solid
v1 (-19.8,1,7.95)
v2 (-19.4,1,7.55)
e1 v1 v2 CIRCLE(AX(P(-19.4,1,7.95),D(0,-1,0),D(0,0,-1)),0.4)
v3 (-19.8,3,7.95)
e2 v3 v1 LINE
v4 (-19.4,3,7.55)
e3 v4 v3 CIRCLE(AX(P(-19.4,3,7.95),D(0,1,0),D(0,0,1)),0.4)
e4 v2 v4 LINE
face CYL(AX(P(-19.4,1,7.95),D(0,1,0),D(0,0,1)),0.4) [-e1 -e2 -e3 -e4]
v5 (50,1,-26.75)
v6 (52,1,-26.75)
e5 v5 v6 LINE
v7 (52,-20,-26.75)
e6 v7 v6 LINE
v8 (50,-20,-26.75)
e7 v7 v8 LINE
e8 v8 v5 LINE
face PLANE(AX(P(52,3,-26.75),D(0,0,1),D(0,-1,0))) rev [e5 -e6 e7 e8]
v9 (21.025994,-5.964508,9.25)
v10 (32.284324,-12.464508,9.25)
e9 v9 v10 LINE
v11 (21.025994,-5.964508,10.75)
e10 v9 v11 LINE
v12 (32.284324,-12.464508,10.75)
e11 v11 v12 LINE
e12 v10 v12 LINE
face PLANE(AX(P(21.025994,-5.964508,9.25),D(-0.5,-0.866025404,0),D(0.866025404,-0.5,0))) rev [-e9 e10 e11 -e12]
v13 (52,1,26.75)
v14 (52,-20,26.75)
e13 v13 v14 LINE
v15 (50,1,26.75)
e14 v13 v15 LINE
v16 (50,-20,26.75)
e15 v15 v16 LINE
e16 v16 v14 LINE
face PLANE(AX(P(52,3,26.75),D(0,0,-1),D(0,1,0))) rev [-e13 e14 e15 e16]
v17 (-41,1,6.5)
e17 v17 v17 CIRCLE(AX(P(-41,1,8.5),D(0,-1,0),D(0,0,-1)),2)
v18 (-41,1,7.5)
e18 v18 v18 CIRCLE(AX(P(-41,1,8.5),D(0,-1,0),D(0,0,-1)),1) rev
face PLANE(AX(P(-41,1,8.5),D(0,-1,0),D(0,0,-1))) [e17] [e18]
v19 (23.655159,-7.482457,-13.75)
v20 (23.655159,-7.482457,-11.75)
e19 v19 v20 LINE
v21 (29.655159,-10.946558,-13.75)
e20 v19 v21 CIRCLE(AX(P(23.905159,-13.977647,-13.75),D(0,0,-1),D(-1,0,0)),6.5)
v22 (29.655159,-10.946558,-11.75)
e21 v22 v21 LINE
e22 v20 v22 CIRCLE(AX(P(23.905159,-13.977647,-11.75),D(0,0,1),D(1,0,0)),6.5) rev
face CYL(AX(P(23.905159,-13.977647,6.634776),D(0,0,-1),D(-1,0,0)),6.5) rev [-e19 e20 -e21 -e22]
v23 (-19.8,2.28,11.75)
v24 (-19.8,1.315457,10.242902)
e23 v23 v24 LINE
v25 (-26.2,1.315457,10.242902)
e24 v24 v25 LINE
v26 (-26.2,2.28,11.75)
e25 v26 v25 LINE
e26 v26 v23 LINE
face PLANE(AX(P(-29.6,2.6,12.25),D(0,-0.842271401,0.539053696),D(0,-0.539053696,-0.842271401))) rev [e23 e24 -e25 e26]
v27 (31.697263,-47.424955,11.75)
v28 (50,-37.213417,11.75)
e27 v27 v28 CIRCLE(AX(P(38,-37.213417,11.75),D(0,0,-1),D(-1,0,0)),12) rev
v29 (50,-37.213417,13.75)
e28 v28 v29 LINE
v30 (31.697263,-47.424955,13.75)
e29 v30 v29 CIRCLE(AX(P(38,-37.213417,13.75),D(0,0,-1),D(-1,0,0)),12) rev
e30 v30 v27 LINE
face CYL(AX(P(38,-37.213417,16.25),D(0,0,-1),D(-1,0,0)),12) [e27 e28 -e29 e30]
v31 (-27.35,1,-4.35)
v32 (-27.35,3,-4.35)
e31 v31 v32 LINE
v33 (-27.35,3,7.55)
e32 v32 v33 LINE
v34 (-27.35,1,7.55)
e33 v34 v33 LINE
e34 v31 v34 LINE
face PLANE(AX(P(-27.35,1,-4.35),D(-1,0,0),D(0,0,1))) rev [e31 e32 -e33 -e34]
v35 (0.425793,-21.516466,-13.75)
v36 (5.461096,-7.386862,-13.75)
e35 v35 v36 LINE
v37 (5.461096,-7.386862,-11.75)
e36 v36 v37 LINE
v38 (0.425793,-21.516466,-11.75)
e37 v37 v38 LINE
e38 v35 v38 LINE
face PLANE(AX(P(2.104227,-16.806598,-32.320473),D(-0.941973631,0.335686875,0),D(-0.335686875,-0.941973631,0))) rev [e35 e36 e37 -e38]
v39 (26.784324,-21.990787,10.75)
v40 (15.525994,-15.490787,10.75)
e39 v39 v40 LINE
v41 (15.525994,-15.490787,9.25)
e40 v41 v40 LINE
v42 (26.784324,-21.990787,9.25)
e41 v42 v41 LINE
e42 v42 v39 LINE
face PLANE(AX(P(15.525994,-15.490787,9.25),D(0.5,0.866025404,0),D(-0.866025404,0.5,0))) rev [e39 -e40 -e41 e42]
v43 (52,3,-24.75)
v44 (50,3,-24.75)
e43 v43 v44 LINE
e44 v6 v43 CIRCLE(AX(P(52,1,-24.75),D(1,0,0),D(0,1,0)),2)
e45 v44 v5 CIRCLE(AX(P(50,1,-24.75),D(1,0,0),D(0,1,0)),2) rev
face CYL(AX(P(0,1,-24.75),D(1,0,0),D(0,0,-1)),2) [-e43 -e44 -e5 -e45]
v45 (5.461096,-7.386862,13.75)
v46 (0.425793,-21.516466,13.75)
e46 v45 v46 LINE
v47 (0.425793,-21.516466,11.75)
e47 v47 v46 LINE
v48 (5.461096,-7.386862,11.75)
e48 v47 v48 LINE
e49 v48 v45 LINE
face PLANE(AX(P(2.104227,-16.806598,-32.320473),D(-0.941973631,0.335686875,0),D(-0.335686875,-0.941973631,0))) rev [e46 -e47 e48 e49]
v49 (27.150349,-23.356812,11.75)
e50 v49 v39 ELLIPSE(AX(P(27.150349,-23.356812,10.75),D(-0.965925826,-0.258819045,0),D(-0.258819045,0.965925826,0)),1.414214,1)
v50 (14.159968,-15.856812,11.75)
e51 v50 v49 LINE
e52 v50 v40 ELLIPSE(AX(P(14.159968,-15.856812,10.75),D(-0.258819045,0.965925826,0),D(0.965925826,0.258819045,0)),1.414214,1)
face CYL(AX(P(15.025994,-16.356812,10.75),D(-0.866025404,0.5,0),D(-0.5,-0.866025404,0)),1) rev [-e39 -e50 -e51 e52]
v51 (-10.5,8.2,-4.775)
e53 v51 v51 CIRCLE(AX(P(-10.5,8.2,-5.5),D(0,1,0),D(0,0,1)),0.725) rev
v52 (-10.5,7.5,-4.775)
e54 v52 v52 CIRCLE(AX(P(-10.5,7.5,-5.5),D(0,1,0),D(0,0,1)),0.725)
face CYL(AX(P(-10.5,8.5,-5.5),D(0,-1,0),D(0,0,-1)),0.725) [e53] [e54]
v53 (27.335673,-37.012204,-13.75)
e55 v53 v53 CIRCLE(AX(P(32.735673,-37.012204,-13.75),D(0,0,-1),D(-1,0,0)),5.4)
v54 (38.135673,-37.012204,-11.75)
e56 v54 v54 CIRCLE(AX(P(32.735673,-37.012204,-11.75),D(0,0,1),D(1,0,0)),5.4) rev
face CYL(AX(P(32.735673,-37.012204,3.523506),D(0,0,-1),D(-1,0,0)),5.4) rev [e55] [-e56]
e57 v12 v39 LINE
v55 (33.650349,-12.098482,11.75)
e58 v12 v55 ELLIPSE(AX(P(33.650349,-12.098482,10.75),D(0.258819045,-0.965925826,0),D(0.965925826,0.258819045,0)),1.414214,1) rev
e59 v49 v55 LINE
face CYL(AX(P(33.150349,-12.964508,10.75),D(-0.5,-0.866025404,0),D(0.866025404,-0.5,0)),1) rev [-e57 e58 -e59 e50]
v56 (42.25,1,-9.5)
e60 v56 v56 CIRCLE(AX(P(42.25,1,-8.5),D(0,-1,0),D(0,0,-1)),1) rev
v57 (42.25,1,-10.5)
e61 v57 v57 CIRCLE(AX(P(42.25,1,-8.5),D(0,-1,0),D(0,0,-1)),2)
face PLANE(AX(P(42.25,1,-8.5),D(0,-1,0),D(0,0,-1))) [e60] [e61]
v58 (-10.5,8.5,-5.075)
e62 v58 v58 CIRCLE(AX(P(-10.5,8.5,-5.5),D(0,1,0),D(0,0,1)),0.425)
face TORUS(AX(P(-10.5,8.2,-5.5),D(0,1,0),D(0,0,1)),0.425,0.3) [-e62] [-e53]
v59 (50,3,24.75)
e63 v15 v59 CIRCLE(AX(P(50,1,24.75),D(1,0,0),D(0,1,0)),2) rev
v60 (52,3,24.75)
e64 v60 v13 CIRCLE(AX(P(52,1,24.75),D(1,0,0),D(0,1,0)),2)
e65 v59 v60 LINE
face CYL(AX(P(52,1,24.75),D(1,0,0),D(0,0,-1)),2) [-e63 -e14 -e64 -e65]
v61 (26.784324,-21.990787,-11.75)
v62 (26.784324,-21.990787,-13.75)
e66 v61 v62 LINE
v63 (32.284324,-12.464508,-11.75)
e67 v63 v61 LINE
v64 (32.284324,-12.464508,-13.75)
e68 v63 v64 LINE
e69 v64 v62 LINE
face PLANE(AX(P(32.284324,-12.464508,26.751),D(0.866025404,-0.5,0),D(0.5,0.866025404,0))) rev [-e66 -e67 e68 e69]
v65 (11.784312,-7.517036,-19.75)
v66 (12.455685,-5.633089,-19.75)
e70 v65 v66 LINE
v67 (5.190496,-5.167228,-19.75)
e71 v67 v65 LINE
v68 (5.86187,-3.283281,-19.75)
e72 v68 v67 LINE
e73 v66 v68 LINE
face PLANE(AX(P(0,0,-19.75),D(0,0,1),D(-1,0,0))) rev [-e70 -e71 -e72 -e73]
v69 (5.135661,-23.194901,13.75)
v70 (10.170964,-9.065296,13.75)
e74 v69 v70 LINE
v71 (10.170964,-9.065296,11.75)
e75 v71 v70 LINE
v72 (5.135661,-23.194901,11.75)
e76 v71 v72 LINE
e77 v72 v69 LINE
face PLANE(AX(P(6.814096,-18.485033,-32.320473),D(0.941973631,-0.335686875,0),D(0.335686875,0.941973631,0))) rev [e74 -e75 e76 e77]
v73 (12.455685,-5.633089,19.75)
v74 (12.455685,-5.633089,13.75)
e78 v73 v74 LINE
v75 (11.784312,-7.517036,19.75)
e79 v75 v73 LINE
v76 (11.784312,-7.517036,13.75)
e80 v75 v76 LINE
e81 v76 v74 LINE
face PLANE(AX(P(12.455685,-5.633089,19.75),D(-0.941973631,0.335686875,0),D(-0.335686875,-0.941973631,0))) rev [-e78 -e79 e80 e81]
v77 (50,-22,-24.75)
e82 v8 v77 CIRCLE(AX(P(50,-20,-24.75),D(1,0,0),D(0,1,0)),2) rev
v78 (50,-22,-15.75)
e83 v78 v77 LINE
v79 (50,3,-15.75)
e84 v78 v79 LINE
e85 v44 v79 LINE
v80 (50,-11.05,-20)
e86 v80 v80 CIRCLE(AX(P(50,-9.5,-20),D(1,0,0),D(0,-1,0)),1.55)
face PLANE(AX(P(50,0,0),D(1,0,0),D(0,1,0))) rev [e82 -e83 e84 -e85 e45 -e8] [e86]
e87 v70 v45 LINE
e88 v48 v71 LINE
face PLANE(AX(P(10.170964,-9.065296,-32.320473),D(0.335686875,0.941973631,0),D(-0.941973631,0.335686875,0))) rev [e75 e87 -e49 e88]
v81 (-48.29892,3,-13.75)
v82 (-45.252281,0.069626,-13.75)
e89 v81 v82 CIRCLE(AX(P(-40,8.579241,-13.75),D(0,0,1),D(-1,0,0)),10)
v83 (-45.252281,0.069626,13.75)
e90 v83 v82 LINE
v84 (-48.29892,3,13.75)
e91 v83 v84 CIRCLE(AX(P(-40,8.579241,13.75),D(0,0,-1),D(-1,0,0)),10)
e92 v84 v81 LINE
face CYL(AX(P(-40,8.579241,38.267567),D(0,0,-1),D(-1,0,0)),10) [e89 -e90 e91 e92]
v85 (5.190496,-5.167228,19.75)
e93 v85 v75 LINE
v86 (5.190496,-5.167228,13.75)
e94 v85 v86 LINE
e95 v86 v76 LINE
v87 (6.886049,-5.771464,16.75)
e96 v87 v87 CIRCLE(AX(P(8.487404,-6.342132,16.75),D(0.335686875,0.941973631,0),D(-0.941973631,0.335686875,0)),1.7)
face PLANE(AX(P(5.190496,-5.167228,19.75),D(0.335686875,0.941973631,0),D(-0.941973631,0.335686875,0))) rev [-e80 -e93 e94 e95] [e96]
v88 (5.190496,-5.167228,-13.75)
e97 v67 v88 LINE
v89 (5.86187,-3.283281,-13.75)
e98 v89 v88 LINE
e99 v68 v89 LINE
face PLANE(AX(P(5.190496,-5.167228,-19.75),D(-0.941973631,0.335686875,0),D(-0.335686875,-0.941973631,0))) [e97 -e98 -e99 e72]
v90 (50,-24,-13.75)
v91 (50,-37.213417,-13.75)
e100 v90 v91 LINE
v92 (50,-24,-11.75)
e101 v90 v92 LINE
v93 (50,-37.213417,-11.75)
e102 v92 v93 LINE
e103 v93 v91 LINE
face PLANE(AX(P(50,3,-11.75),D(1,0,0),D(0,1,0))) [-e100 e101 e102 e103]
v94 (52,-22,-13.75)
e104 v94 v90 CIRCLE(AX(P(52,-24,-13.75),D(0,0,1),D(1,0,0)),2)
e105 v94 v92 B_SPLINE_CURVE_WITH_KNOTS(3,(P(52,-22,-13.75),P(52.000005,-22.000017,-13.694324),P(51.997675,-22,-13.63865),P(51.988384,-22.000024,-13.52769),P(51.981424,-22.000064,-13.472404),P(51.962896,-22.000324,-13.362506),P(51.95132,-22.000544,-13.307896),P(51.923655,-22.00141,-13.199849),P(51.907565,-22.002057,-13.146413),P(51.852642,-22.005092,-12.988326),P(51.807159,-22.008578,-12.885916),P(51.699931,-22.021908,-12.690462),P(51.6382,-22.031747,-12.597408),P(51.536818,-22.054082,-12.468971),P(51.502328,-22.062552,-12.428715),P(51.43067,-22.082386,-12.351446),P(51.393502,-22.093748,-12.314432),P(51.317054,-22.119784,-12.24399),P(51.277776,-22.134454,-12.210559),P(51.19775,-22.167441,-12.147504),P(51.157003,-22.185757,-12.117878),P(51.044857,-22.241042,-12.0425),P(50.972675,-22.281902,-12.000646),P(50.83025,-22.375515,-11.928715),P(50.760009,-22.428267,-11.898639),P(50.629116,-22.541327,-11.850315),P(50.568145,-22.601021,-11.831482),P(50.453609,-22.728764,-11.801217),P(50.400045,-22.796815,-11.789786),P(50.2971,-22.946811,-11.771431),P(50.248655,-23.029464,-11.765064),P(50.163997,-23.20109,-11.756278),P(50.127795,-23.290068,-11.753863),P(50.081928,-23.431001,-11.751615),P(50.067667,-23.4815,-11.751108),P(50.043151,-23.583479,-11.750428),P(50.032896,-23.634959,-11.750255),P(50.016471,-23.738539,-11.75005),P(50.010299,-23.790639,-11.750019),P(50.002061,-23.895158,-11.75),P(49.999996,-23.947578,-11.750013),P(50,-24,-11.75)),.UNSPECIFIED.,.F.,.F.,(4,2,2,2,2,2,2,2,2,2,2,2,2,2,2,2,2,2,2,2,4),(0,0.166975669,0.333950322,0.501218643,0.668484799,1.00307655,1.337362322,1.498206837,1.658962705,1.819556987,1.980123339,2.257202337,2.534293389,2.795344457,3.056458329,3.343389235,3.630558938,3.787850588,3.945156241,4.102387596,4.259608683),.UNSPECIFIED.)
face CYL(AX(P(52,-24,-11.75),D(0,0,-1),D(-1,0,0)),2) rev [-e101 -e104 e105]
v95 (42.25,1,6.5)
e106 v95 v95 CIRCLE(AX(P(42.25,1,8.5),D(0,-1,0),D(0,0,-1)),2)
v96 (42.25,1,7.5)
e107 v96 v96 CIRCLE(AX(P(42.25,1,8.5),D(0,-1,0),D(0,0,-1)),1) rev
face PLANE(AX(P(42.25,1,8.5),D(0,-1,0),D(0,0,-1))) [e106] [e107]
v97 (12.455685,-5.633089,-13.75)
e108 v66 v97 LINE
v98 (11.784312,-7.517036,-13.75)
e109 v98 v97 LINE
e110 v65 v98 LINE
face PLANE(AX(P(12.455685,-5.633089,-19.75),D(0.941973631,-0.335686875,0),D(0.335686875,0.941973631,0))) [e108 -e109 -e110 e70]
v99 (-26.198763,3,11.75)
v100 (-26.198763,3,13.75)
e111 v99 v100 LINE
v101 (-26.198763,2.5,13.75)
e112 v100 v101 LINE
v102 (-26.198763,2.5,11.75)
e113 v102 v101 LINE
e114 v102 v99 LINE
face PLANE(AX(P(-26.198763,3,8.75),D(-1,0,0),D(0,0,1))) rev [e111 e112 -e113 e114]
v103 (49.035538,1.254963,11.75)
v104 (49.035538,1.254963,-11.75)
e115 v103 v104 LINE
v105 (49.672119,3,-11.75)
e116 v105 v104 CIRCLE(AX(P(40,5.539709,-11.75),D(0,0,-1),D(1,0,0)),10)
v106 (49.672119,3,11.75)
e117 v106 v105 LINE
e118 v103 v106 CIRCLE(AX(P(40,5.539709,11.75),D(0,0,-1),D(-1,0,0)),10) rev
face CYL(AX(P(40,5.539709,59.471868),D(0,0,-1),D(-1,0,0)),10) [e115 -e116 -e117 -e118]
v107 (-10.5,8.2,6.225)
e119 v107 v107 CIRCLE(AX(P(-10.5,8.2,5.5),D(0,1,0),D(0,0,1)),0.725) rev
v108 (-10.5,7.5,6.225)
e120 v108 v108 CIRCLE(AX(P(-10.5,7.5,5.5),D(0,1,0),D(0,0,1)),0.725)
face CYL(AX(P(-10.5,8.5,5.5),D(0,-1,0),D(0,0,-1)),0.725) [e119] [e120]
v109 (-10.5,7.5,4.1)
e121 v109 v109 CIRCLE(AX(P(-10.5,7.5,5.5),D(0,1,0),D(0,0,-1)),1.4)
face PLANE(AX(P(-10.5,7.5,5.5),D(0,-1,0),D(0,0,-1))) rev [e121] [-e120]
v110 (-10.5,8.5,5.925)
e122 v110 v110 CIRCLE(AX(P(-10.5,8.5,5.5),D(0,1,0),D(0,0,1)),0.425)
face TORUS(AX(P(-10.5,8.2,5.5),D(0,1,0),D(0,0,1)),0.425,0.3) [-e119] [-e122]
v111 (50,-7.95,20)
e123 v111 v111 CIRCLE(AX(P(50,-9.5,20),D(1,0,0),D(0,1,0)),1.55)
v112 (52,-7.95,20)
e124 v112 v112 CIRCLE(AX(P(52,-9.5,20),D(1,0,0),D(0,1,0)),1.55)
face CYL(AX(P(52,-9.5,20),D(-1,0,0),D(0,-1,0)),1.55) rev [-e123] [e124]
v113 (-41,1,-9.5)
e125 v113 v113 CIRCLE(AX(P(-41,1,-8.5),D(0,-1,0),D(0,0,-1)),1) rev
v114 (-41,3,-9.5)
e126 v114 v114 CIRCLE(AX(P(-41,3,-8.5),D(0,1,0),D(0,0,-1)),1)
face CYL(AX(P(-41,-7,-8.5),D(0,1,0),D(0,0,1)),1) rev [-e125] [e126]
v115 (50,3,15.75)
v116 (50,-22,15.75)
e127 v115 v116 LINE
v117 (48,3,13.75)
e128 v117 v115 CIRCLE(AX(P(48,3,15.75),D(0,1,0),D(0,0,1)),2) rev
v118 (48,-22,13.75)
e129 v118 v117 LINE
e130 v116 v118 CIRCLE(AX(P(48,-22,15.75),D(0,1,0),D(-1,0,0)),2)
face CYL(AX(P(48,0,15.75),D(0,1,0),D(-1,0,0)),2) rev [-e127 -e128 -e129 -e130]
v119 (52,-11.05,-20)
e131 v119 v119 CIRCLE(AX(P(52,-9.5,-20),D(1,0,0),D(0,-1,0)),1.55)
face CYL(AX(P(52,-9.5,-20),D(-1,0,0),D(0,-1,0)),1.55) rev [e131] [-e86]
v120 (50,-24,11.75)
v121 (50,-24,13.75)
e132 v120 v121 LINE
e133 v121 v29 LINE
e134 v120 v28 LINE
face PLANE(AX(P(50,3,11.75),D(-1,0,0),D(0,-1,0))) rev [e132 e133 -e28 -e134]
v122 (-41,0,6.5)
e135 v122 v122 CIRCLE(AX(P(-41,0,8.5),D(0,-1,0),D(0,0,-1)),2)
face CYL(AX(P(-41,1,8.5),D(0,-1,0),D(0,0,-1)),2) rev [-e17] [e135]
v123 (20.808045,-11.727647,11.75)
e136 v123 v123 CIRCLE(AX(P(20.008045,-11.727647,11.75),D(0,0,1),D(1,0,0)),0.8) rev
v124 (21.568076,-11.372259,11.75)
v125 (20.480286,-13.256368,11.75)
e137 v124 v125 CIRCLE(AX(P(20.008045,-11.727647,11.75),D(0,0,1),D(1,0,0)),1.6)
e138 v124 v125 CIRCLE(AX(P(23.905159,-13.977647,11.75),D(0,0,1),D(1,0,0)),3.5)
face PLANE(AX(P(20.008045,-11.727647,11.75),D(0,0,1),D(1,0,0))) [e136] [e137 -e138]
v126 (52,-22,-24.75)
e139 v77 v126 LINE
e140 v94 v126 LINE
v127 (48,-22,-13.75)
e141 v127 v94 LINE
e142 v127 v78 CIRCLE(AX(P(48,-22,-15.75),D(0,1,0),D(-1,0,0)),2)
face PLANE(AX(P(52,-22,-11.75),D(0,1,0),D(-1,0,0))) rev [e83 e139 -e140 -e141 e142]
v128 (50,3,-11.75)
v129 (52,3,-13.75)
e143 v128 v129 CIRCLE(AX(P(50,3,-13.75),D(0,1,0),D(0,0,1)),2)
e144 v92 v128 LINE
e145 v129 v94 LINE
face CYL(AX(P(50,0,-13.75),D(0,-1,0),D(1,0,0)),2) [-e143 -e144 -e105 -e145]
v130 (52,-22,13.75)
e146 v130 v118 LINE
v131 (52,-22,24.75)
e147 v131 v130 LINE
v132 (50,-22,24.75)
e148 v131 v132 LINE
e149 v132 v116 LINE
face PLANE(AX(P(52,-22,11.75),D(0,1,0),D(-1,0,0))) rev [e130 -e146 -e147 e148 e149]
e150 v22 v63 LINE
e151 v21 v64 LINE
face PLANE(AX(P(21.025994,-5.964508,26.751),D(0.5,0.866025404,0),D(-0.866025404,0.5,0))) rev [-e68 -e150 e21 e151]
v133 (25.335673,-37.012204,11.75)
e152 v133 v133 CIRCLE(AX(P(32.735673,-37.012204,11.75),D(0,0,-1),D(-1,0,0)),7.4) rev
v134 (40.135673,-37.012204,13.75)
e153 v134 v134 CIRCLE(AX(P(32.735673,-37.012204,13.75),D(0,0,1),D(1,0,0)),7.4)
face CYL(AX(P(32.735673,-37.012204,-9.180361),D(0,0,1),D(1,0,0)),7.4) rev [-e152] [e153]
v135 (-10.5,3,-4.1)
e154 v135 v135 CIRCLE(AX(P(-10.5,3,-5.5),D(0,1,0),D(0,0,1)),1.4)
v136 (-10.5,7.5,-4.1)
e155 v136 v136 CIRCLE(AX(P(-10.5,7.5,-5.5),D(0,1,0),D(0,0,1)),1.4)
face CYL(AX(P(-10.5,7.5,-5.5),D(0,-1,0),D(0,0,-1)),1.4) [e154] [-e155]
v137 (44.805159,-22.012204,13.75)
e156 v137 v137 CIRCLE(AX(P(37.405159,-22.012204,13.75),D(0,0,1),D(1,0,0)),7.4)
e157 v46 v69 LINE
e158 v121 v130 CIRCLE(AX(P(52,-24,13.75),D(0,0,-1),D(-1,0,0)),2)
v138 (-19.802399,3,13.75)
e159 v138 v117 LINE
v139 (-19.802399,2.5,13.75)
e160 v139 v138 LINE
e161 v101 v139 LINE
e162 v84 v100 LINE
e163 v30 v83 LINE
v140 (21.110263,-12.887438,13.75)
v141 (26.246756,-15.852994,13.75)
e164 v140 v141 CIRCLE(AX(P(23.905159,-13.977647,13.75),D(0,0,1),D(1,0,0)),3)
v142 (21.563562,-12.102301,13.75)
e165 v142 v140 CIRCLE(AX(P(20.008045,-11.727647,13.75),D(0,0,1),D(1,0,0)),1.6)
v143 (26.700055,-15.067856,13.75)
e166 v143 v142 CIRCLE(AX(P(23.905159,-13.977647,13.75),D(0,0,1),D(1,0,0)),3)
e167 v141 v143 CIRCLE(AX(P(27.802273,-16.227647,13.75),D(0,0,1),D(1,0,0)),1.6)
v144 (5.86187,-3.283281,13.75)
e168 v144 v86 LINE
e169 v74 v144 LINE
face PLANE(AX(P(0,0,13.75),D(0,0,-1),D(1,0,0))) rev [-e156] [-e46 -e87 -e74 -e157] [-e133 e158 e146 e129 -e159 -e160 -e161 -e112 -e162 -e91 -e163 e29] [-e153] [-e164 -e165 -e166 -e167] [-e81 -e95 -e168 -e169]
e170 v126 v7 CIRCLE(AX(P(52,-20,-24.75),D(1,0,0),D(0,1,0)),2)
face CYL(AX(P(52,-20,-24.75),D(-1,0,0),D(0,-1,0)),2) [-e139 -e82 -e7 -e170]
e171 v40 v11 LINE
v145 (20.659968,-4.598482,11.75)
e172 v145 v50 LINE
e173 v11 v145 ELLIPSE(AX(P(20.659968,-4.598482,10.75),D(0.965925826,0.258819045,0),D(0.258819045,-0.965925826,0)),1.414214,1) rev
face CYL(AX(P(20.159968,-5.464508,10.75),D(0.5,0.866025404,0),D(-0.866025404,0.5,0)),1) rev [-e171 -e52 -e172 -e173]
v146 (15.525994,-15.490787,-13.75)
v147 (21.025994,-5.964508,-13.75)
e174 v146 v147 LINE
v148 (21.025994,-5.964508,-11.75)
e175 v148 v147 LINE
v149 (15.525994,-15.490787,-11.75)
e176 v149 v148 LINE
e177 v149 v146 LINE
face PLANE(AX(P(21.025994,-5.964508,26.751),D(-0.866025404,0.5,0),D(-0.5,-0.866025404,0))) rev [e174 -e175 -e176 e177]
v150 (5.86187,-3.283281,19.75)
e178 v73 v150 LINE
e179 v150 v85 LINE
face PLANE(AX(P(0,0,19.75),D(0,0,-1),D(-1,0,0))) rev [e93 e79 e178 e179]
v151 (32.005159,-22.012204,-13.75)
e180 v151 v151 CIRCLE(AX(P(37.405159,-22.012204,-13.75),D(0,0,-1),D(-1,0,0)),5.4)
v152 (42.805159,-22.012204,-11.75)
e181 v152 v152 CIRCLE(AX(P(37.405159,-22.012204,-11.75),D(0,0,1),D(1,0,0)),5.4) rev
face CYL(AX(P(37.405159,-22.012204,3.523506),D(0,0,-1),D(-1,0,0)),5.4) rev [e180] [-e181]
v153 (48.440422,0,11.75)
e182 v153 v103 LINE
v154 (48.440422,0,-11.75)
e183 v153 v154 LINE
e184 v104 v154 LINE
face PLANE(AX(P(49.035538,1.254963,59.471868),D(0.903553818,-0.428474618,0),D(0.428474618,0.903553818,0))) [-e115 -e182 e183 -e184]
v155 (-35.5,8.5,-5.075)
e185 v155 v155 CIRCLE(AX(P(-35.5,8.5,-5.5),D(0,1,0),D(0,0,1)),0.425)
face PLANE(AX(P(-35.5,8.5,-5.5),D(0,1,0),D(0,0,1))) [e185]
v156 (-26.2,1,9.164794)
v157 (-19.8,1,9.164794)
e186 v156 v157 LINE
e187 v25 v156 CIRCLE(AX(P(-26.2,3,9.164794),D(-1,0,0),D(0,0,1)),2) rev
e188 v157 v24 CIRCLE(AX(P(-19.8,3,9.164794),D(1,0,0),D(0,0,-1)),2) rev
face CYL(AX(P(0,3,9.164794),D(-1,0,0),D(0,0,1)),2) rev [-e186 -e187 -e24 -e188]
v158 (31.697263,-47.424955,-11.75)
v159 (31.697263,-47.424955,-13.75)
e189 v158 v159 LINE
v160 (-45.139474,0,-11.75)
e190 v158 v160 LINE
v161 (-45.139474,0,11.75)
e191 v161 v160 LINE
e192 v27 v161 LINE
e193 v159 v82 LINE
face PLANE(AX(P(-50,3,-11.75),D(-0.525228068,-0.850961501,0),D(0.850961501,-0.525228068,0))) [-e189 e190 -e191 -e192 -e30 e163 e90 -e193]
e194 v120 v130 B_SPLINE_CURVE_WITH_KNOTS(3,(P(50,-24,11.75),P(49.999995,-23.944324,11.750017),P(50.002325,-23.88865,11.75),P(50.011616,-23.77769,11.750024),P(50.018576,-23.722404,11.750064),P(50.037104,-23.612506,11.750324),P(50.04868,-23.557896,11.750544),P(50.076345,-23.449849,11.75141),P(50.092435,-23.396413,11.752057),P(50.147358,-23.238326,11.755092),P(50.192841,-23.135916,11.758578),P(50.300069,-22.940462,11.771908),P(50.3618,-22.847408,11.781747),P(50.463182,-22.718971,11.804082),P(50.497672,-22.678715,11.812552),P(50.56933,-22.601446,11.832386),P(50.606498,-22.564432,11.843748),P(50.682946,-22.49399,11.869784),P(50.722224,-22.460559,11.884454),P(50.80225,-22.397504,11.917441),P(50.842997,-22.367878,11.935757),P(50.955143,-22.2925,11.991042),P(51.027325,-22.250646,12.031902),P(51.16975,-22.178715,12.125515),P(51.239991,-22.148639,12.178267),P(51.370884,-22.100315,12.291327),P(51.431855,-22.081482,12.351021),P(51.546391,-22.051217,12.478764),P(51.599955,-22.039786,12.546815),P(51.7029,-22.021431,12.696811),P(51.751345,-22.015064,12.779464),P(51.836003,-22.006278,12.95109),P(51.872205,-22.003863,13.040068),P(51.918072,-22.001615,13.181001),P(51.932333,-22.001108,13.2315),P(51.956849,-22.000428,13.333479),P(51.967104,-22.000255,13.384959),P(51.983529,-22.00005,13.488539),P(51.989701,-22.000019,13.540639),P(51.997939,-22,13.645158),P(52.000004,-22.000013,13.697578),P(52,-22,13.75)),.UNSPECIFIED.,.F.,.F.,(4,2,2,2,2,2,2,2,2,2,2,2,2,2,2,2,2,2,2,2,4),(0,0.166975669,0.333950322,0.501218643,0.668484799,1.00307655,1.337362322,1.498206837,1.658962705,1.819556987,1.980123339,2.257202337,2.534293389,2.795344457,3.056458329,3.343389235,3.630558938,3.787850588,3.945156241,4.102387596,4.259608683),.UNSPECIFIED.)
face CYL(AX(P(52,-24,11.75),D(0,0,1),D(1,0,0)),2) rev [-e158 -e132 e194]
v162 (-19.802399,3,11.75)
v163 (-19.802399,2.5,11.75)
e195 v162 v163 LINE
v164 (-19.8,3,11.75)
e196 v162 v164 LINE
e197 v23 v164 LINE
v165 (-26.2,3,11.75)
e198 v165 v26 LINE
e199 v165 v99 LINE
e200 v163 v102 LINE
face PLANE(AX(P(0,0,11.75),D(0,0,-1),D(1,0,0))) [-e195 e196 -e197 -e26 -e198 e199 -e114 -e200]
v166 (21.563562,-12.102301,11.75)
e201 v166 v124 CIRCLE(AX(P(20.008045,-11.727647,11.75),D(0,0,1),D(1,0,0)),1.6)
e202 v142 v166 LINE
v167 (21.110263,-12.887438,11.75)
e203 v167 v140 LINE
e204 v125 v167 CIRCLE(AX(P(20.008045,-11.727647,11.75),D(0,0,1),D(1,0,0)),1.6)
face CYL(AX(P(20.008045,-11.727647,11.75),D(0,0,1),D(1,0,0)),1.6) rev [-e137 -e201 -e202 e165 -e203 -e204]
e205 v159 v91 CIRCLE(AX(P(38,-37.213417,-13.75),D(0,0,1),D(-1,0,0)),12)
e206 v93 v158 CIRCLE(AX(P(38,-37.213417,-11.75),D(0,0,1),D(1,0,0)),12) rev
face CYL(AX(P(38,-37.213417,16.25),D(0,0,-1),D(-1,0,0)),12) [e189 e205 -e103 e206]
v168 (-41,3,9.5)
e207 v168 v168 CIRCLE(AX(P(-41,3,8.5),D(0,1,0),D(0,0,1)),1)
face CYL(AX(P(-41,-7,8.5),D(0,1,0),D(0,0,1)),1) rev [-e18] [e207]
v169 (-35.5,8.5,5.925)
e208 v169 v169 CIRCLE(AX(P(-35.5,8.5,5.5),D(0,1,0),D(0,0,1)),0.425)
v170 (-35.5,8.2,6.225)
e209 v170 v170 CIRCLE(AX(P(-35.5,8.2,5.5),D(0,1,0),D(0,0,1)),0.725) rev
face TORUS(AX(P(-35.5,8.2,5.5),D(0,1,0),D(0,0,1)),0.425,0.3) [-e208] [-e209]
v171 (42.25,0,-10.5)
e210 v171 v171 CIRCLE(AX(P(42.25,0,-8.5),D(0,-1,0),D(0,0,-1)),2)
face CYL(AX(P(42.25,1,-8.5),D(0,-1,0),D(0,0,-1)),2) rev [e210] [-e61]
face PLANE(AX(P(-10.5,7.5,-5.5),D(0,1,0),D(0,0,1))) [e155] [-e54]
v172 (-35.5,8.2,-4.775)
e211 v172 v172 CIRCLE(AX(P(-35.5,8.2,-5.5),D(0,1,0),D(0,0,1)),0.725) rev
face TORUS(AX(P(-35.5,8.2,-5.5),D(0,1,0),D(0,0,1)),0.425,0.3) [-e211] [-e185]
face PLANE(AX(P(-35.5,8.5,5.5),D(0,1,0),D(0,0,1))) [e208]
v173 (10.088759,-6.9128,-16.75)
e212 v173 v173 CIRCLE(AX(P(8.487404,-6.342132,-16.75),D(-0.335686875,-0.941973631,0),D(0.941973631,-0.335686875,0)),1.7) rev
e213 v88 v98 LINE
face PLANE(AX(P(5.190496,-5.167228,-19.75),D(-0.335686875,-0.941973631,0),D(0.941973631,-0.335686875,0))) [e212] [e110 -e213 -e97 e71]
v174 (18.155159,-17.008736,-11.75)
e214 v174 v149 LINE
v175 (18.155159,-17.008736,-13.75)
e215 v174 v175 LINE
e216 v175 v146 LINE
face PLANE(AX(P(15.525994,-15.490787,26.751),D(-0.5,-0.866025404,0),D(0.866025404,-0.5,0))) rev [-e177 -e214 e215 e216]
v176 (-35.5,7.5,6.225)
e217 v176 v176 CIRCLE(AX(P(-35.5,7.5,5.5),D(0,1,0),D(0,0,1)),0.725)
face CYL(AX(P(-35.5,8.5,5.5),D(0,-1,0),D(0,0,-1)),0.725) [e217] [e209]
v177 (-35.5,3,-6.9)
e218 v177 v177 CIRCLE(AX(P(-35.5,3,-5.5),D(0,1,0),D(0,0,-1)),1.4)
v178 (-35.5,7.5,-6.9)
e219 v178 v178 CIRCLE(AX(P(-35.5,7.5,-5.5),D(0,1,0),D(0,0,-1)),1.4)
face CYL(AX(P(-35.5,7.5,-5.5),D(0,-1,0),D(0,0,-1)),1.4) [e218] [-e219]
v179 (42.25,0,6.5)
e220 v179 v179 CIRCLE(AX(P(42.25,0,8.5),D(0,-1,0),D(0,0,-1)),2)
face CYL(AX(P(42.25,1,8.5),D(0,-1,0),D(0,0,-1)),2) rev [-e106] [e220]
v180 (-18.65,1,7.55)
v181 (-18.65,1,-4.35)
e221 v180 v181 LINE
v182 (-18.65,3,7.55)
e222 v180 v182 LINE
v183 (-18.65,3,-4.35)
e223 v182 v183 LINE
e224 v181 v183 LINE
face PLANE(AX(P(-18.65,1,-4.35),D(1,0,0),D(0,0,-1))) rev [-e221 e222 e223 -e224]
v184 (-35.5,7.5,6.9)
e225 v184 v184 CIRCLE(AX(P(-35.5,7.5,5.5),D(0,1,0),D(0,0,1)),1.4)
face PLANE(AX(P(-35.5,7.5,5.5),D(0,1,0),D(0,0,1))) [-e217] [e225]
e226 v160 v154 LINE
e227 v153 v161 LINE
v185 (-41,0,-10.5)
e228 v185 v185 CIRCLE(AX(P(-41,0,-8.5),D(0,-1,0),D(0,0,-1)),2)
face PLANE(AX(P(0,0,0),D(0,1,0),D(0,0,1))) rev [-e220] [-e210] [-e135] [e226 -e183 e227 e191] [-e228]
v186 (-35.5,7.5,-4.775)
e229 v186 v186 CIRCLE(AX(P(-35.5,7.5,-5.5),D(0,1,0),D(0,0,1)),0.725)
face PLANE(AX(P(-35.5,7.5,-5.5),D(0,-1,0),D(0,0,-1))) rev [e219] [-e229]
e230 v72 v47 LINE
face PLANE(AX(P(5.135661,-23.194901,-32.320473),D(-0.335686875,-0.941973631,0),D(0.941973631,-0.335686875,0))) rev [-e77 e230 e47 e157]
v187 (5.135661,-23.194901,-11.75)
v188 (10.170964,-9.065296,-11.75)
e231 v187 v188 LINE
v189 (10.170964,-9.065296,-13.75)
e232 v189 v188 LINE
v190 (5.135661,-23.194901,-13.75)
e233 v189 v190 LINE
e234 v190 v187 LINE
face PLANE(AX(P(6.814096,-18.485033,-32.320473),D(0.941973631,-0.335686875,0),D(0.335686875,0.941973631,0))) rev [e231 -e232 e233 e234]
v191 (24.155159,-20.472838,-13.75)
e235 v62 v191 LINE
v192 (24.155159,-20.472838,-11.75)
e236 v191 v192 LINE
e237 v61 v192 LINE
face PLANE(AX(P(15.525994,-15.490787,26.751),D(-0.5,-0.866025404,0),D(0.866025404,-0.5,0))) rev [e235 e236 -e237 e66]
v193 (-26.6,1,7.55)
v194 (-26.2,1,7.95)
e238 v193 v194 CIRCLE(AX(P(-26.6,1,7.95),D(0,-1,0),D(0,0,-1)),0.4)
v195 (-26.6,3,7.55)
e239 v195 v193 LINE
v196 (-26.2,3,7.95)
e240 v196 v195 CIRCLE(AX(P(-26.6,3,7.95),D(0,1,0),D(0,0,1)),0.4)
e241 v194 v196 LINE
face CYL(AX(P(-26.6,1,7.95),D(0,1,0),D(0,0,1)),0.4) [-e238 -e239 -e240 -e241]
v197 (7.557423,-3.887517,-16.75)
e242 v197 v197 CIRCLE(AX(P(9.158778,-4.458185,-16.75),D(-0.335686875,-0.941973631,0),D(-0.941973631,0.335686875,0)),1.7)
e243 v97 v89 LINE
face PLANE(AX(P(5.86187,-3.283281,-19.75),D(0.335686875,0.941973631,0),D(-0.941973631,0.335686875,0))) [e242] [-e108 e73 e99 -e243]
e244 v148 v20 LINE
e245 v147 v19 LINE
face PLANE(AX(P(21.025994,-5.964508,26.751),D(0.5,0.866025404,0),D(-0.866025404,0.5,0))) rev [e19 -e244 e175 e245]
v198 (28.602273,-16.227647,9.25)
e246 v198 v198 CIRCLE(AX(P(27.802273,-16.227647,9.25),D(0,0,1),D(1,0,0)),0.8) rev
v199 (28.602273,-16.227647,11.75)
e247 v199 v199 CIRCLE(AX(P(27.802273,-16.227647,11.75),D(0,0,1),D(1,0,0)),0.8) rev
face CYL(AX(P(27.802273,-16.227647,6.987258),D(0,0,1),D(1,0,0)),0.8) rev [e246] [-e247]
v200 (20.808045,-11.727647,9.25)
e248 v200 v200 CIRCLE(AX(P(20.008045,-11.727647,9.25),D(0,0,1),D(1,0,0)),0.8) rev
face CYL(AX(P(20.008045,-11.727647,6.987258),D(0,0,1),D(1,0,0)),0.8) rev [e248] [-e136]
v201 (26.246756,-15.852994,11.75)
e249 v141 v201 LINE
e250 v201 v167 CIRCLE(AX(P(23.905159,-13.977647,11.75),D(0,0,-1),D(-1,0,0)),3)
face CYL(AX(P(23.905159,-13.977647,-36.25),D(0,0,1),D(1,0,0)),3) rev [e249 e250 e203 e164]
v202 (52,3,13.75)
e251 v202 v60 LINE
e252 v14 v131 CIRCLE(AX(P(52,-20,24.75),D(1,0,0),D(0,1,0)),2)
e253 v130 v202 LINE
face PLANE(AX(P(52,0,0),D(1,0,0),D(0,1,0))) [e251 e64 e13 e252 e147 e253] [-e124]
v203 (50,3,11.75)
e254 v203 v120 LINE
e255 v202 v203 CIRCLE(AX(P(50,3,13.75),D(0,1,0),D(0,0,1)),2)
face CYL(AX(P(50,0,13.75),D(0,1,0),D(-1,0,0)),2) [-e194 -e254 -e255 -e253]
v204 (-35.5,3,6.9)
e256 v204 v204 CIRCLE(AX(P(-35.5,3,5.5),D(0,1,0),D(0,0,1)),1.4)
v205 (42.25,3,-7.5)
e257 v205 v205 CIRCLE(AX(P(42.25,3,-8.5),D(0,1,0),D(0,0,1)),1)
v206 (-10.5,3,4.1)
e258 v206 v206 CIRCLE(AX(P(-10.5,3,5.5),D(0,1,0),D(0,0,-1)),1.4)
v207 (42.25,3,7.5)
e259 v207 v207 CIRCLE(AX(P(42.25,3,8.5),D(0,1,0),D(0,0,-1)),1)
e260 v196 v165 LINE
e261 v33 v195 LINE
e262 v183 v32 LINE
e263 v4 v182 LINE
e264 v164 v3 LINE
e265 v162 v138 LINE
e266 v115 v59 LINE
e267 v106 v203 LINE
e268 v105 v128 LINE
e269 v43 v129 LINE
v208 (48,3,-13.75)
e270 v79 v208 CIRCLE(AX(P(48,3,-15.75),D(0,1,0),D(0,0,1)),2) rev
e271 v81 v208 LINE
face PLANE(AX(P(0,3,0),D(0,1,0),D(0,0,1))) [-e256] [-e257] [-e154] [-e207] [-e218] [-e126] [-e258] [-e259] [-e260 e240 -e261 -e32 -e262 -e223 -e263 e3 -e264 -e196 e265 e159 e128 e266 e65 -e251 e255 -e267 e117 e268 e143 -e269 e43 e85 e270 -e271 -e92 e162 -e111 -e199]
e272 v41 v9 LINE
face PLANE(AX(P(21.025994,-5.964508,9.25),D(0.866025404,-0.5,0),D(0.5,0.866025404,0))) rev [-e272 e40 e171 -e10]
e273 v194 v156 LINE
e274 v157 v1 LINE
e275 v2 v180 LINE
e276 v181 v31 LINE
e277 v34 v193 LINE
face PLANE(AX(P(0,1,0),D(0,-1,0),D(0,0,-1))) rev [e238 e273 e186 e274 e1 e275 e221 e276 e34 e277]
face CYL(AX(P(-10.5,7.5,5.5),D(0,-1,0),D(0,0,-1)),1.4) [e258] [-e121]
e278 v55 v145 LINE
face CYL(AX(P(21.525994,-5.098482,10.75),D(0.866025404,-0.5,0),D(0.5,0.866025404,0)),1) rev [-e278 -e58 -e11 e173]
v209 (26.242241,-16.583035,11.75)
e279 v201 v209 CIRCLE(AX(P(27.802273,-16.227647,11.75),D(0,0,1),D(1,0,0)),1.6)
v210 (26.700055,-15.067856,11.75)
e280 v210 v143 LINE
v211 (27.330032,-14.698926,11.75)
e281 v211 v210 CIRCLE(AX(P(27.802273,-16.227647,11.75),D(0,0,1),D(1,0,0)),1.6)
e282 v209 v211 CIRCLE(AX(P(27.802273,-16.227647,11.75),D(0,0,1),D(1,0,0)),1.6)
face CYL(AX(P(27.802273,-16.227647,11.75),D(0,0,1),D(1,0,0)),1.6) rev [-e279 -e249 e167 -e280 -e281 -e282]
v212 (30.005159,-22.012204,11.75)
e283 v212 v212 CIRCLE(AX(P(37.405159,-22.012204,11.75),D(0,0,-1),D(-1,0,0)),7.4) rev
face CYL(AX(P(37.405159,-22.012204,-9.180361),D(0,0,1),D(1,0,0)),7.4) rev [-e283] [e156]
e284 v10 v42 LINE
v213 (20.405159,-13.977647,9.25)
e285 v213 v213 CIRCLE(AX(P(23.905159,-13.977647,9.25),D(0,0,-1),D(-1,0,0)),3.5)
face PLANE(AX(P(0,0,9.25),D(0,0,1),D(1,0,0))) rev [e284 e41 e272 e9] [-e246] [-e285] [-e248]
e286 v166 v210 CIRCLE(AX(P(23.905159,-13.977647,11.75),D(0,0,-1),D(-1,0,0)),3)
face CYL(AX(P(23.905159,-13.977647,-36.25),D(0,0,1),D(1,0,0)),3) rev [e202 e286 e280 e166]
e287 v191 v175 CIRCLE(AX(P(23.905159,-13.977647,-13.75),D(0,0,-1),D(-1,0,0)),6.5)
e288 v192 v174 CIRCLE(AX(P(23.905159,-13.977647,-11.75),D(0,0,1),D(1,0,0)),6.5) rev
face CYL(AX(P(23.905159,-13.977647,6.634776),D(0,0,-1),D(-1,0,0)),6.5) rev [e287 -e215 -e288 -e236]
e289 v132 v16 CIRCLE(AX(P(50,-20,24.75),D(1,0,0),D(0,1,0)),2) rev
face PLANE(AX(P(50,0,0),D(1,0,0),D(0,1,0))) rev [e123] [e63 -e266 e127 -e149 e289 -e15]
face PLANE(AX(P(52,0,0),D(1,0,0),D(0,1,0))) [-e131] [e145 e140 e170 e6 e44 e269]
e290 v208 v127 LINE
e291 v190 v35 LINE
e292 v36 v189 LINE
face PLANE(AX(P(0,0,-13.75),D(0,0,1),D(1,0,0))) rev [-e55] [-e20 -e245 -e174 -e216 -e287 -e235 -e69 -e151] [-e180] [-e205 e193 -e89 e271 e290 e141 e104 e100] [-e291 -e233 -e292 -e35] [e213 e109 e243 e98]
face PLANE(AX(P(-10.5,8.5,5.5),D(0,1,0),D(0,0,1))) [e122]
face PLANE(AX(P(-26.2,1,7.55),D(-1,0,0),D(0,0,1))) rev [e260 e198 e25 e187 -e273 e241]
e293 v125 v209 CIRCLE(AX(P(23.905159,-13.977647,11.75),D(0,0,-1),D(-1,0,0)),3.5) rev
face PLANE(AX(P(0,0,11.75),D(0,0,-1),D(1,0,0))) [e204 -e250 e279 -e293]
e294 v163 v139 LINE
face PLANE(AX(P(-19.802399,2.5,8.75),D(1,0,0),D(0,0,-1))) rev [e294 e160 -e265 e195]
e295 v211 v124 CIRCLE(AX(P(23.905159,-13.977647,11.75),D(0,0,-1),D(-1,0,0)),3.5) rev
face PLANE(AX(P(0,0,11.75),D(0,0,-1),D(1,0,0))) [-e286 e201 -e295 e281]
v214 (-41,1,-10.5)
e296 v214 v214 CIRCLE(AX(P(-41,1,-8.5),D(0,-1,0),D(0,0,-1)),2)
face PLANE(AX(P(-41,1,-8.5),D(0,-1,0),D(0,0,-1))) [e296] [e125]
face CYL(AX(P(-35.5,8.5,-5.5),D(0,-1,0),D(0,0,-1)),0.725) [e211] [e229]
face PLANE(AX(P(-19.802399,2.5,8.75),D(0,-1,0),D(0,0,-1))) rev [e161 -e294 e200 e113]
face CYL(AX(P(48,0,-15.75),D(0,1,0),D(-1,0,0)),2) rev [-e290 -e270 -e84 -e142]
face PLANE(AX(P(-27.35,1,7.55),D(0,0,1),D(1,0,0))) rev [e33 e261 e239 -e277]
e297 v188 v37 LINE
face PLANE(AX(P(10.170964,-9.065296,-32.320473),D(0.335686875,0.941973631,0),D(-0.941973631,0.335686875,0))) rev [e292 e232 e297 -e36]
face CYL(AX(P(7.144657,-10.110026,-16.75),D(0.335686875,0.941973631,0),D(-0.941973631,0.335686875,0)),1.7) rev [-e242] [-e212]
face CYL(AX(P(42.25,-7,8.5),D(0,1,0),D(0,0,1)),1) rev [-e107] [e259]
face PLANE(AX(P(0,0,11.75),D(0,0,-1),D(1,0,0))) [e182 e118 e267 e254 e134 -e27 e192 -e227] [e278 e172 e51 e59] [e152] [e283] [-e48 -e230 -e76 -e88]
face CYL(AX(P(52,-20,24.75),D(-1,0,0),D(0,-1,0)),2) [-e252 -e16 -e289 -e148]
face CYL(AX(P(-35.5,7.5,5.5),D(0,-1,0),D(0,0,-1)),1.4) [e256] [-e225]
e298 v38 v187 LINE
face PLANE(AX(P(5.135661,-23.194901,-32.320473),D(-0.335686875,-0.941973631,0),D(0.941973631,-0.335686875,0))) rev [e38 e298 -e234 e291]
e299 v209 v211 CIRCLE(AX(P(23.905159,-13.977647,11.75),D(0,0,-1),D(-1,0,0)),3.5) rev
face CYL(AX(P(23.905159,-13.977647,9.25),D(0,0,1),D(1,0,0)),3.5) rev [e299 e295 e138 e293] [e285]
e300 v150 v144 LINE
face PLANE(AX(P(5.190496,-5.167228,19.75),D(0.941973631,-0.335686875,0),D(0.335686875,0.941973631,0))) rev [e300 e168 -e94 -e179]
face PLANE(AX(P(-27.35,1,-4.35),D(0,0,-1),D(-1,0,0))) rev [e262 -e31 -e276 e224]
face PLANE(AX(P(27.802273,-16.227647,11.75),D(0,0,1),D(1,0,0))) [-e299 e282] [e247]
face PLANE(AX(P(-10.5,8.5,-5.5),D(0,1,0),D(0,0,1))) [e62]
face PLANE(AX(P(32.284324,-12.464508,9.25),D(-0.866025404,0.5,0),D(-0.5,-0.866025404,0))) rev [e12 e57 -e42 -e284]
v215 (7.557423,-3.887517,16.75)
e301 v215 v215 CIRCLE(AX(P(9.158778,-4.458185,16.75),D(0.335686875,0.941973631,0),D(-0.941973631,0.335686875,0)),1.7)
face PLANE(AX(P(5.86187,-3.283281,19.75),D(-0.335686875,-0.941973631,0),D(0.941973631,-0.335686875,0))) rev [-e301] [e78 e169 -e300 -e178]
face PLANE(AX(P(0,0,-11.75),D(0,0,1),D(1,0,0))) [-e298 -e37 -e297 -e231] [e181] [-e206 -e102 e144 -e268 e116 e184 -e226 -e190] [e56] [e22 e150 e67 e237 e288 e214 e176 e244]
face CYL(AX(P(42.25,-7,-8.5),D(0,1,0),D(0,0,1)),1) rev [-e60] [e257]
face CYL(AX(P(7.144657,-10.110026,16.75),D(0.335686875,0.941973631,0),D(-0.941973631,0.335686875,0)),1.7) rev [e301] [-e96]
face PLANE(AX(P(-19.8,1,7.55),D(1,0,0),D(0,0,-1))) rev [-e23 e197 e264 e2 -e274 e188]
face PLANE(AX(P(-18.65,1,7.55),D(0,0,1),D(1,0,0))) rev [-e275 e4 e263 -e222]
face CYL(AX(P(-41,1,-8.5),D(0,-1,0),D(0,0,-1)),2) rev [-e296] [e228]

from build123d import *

# Parameters (mm, degrees)
SKETCH_1_W           = 100
SKETCH_1_H           = 25.5
EXTRUDE_1_DEPTH      = 3
EXTRUDE_2_DEPTH      = 1.5
SKETCH_5_R           = 1.4
EXTRUDE_3_DEPTH      = 4.5
SKETCH_6_R           = 0.725
EXTRUDE_4_DEPTH      = 1
SKETCH_7_R           = 1
CUT_EXTRUDE_1_DEPTH  = 10
SKETCH_8_R           = 2
CUT_EXTRUDE_2_DEPTH  = 1
FILLET_1_R           = 2
FILLET_2_R           = 0.3
CUT_EXTRUDE_8_DEPTH  = 2
CUT_EXTRUDE_9_DEPTH  = 1.5
EXTRUDE_6_DEPTH      = 6.4
FILLET_3_R           = 2
FILLET_5_R           = 1
FILLET_6_R           = 0.4
EXTRUDE_12_DEPTH     = 1
CUT_EXTRUDE_20_DEPTH = 27.5
CUT_EXTRUDE_21_DEPTH = 23.5
CUT_EXTRUDE_22_DEPTH = 30
SKETCH_41_R          = 3
CUT_EXTRUDE_25_DEPTH = 50
SKETCH_48_W          = 6.396363923
SKETCH_48_H          = 0.5
CUT_EXTRUDE_30_DEPTH = 5
SKETCH_50_W          = 15
SKETCH_50_H          = 25
SKETCH_50_R          = 1.55
EXTRUDE_14_DEPTH     = 2
FILLET_8_R           = 2
FILLET_9_R           = 2
FILLET_10_R          = 2
SKETCH_52_R          = 3.5
EXTRUDE_15_DEPTH     = 2.5
SKETCH_51_R          = 0.8
CUT_EXTRUDE_31_DEPTH = 4.5
SKETCH_53_R          = 1.6
CUT_EXTRUDE_34_DEPTH = 2
FILLET_11_R          = 1
SKETCH_54_R          = 6.5
CUT_EXTRUDE_35_DEPTH = 2
CUT_EXTRUDE_36_DEPTH = 2
SKETCH_57_R          = 7.4
CUT_EXTRUDE_37_DEPTH = 2
CUT_EXTRUDE_START    = -40.5
CUT_EXTRUDE_38_DEPTH = 53.5
EXTRUDE_16_DEPTH     = 6
SKETCH_61_R          = 1.7
CUT_EXTRUDE_39_DEPTH = 6
SKETCH_62_R          = 5.4
CUT_EXTRUDE_40_DEPTH = 2


with BuildPart() as part:
    # 草图1 → 凸台-拉伸1 (new body)
    with BuildSketch(Plane(origin=(0, 0, 0), x_dir=(1, 0, 0), z_dir=(0, 1, 0))):
        Rectangle(SKETCH_1_W, SKETCH_1_H)
    extrude(amount=EXTRUDE_1_DEPTH)

    # 草图2 → 凸台-拉伸2 (add)
    with BuildSketch(Plane(origin=(0, 3, 0), x_dir=(1, 0, 0), z_dir=(0, 1, 0))):
        Polygon((-5.35, 5.35), (5.35, 5.35), (5.35, -7.55), (4.35, -7.55), (4.35, 4.35), (-4.35, 4.35), (-4.35, -7.55), (-5.35, -7.55), align=None)
    extrude(amount=EXTRUDE_2_DEPTH)

    # 草图5 → 凸台-拉伸3 (add)
    with BuildSketch(Plane(origin=(0, 3, 0), x_dir=(1, 0, 0), z_dir=(0, 1, 0))):
        with Locations(Location((-10.5, 5.5, 0), (0, 0, 270))):
            Circle(SKETCH_5_R)
        with Locations(Location((-10.5, -5.5, 0), (0, 0, 90))):
            Circle(SKETCH_5_R)
        with Locations(Location((-35.5, -5.5, 0), (0, 0, 270))):
            Circle(SKETCH_5_R)
        with Locations(Location((-35.5, 5.5, 0), (0, 0, 90))):
            Circle(SKETCH_5_R)
    extrude(amount=EXTRUDE_3_DEPTH)

    # 草图6 → 凸台-拉伸4 (add)
    with BuildSketch(Plane(origin=(0, 7.5, 0), x_dir=(1, 0, 0), z_dir=(0, 1, 0))):
        with Locations(Location((-35.5, -5.5, 0), (0, 0, 270))):
            Circle(SKETCH_6_R)
        with Locations(Location((-35.5, 5.5, 0), (0, 0, 270))):
            Circle(SKETCH_6_R)
        with Locations(Location((-10.5, 5.5, 0), (0, 0, 270))):
            Circle(SKETCH_6_R)
        with Locations(Location((-10.5, -5.5, 0), (0, 0, 270))):
            Circle(SKETCH_6_R)
    extrude(amount=EXTRUDE_4_DEPTH)

    # 草图7 → 切除-拉伸1 (cut)
    with BuildSketch(Plane(origin=(0, 3, 0), x_dir=(1, 0, 0), z_dir=(0, 1, 0))):
        with Locations(Location((42.25, 8.5, 0), (0, 0, 270))):
            Circle(SKETCH_7_R)
        with Locations(Location((-41, 8.5, 0), (0, 0, 270))):
            Circle(SKETCH_7_R)
        with Locations(Location((-41, -8.5, 0), (0, 0, 270))):
            Circle(SKETCH_7_R)
        with Locations(Location((42.25, -8.5, 0), (0, 0, 270))):
            Circle(SKETCH_7_R)
    extrude(amount=-CUT_EXTRUDE_1_DEPTH, mode=Mode.SUBTRACT)

    # 草图8 → 切除-拉伸2 (cut)
    with BuildSketch(Plane.XZ):
        with Locations(Location((-41, 8.5, 0), (0, 0, 270))):
            Circle(SKETCH_8_R)
        with Locations(Location((42.25, 8.5, 0), (0, 0, 270))):
            Circle(SKETCH_8_R)
        with Locations(Location((42.25, -8.5, 0), (0, 0, 270))):
            Circle(SKETCH_8_R)
        with Locations(Location((-41, -8.5, 0), (0, 0, 270))):
            Circle(SKETCH_8_R)
    extrude(amount=-CUT_EXTRUDE_2_DEPTH, mode=Mode.SUBTRACT)

    # 圆角1
    fillet_1_edges = [part.edges().sort_by_distance(p)[0] for p in [
        (50, 1.5, 12.75),
        (-50, 1.5, 12.75),
        (-50, 1.5, -12.75),
        (50, 1.5, -12.75),
    ]]
    fillet(fillet_1_edges, radius=FILLET_1_R)

    # 圆角2
    fillet_2_edges = [part.edges().sort_by_distance(p)[0] for p in [
        (-35.5, 8.5, 4.775),
        (-35.5, 8.5, -6.225),
        (-10.5, 8.5, -6.225),
        (-10.5, 8.5, 4.775),
    ]]
    fillet(fillet_2_edges, radius=FILLET_2_R)

    # 草图15 → 切除-拉伸8 (cut)
    with BuildSketch(Plane(origin=(0, 3, 0), x_dir=(1, 0, 0), z_dir=(0, 1, 0))):
        Polygon((-27.35, 4.35), (-18.65, 4.35), (-18.65, -7.55), (-19.8, -7.55), (-19.8, -12.75), (-26.2, -12.75), (-26.2, -7.55), (-27.35, -7.55), align=None)
    extrude(amount=-CUT_EXTRUDE_8_DEPTH, mode=Mode.SUBTRACT)

    # 草图17 → 切除-拉伸9 (cut)
    with BuildSketch(Plane(origin=(0, 4.5, 0), x_dir=(1, 0, 0), z_dir=(0, 1, 0))):
        Polygon((-4.35, -7.55), (-4.35, 4.35), (4.35, 4.35), (4.35, -7.55), (5.35, -7.55), (5.35, 5.35), (-5.35, 5.35), (-5.35, -7.55), align=None)
    extrude(amount=-CUT_EXTRUDE_9_DEPTH, mode=Mode.SUBTRACT)

    # 草图18 → 凸台-拉伸6 (add)
    with BuildSketch(Plane.ZY.offset(19.8)):
        Polygon((12.75, 1), (9.75, 1), (12.25, 2.6), (12.75, 2.6), align=None)
    extrude(amount=EXTRUDE_6_DEPTH)

    # 圆角3
    fillet_3_edges = [part.edges().sort_by_distance(p)[0] for p in [
        (-23, 1, 9.75),
    ]]
    fillet(fillet_3_edges, radius=FILLET_3_R)

    # 圆角5
    fillet_5_edges = [part.edges().sort_by_distance(p)[0] for p in [
        (-23, 2.6, 12.25),
    ]]
    fillet(fillet_5_edges, radius=FILLET_5_R)

    # 圆角6
    fillet_6_edges = [part.edges().sort_by_distance(p)[0] for p in [
        (-19.8, 2, 7.55),
        (-26.2, 2, 7.55),
    ]]
    fillet(fillet_6_edges, radius=FILLET_6_R)

    # 草图26 → 凸台-拉伸12 (add, symmetric)
    with BuildSketch(Plane(origin=(0, 0, -12.75), x_dir=(-1, 0, 0), z_dir=(0, 0, -1))):
        Polygon((50, 3), (-47.226468446, -57.009847793), (-50, -58.721719149), (-50, 3), align=None)
    extrude_12 = extrude(amount=EXTRUDE_12_DEPTH, both=True)

    # 镜向1: 凸台-拉伸12 across plane
    add(extrude_12.mirror(Plane.XY))

    # 草图34 → 切除-拉伸20 (cut)
    with BuildSketch(Plane(origin=(0, 0, -13.75), x_dir=(-1, 0, 0), z_dir=(0, 0, -1))):
        with BuildLine():
            Line((50, 15.008699923), (50, 8.579241028))
            ThreePointArc((50, 8.579241028), (48.73277753, 3.707013959), (45.252280679, 0.069626015))
            Line((45.252280679, 0.069626015), (38.344857738, -4.193754173))
            Line((38.344857738, -4.193754173), (52.839499898, -4.765435378))
            Line((52.839499898, -4.765435378), (50, 15.008699923))
        make_face()
    extrude(amount=-CUT_EXTRUDE_20_DEPTH, mode=Mode.SUBTRACT)

    # 草图35 → 切除-拉伸21 (cut)
    with BuildSketch(Plane.XY.offset(-11.75)):
        with BuildLine():
            Line((50, 10.630966152), (50, 5.53970897))
            ThreePointArc((50, 5.53970897), (49.755905436, 3.343733306), (49.035538177, 1.254962787))
            Line((49.035538177, 1.254962787), (33.740658756, -30.998398561))
            Line((33.740658756, -30.998398561), (57.072453739, -23.756268409))
            Line((57.072453739, -23.756268409), (50, 10.630966152))
        make_face()
    extrude(amount=CUT_EXTRUDE_21_DEPTH, mode=Mode.SUBTRACT)

    # 草图37 → 切除-拉伸22 (cut)
    with BuildSketch(Plane(origin=(0, 0, -13.75), x_dir=(-1, 0, 0), z_dir=(0, 0, -1))):
        with BuildLine():
            Line((-50, -58.721719149), (-31.697263185, -47.424955336))
            ThreePointArc((-31.697263185, -47.424955336), (-43.846672482, -47.692750357), (-50, -37.21341732))
            Line((-50, -37.21341732), (-50, -58.721719149))
        make_face()
    extrude(amount=-CUT_EXTRUDE_22_DEPTH, mode=Mode.SUBTRACT)

    # 草图41 → 切除-拉伸25 (cut)
    with BuildSketch(Plane.XY.offset(13.75)):
        with Locations((23.905158818, -13.977647254)):
            Circle(SKETCH_41_R)
    extrude(amount=-CUT_EXTRUDE_25_DEPTH, mode=Mode.SUBTRACT)

    # 草图48 → 切除-拉伸30 (cut)
    with BuildSketch(Plane.XY.offset(13.75)):
        with Locations((-23.000580627, 2.75)):
            Rectangle(SKETCH_48_W, SKETCH_48_H)
    extrude(amount=-CUT_EXTRUDE_30_DEPTH, mode=Mode.SUBTRACT)

    # 草图50 → 凸台-拉伸14 (add)
    # profile 1 of 2: a face of its own
    with BuildSketch(Plane(origin=(50, 0, 0), x_dir=(0, 0, -1), z_dir=(1, 0, 0))):
        with Locations((19.25, -9.5)):
            Rectangle(SKETCH_50_W, SKETCH_50_H)
        with Locations(Location((20, -9.5, 0), (0, 0, 270))):
            Circle(SKETCH_50_R, mode=Mode.SUBTRACT)
    # profile 2 of 2: a face of its own
    with BuildSketch(Plane(origin=(50, 0, 0), x_dir=(0, 0, -1), z_dir=(1, 0, 0))):
        with Locations((-19.25, -9.5)):
            Rectangle(SKETCH_50_W, SKETCH_50_H)
        with Locations(Location((-20, -9.5, 0), (0, 0, 90))):
            Circle(SKETCH_50_R, mode=Mode.SUBTRACT)
    extrude(amount=EXTRUDE_14_DEPTH)

    # 圆角8
    fillet_8_edges = [part.edges().sort_by_distance(p)[0] for p in [
        (50, -9.5, -13.75),
        (50, -9.5, 13.75),
        (51, -22, -26.75),
        (51, 3, -26.75),
        (51, 3, 26.75),
        (51, -22, 26.75),
    ]]
    fillet(fillet_8_edges, radius=FILLET_8_R)

    # 圆角9
    fillet_9_edges = [part.edges().sort_by_distance(p)[0] for p in [
        (50, -22, 12.75),
        (50, -22, -12.75),
    ]]
    fillet(fillet_9_edges, radius=FILLET_9_R - 0.0001)  # a hair under: the kernel refuses the full size

    # 圆角10
    fillet_10_edges = [part.edges().sort_by_distance(p)[0] for p in [
        (52, -9.5, -11.75),
        (52, -9.5, 11.75),
    ]]
    fillet(fillet_10_edges, radius=FILLET_10_R - 0.0001)  # a hair under: the kernel refuses the full size

    # 草图52 → 凸台-拉伸15 (add)
    with BuildSketch(Plane(origin=(0, 0, 11.75), x_dir=(-1, 0, 0), z_dir=(0, 0, -1))):
        Polygon((-21.025993693, -5.964507533), (-32.284323942, -12.464507533), (-26.784323942, -21.990786975), (-15.525993693, -15.490786975), align=None)
        with Locations((-23.905158818, -13.977647254)):
            Circle(SKETCH_52_R, mode=Mode.SUBTRACT)
    extrude(amount=EXTRUDE_15_DEPTH)

    # 草图51 → 切除-拉伸31 (cut)
    with BuildSketch(Plane.XY.offset(13.75)):
        with Locations((20.0080445, -11.727647254)):
            Circle(SKETCH_51_R)
        with Locations((27.802273135, -16.227647254)):
            Circle(SKETCH_51_R)
    extrude(amount=-CUT_EXTRUDE_31_DEPTH, mode=Mode.SUBTRACT)

    # 草图53 → 切除-拉伸34 (cut)
    with BuildSketch(Plane.XY.offset(13.75)):
        with Locations((20.0080445, -11.727647254)):
            Circle(SKETCH_53_R)
        with Locations((27.802273135, -16.227647254)):
            Circle(SKETCH_53_R)
    extrude(amount=-CUT_EXTRUDE_34_DEPTH, mode=Mode.SUBTRACT)

    # 圆角11
    fillet_11_edges = [part.edges().sort_by_distance(p)[0] for p in [
        (29.534323942, -17.227647254, 11.75),
        (21.155158818, -18.740786975, 11.75),
        (18.275993693, -10.727647254, 11.75),
        (26.655158818, -9.214507533, 11.75),
    ]]
    fillet(fillet_11_edges, radius=FILLET_11_R)

    # 草图54 → 切除-拉伸35 (cut)
    with BuildSketch(Plane(origin=(0, 0, -13.75), x_dir=(-1, 0, 0), z_dir=(0, 0, -1))):
        with Locations((-23.905158818, -13.977647254)):
            Circle(SKETCH_54_R)
    extrude(amount=-CUT_EXTRUDE_35_DEPTH, mode=Mode.SUBTRACT)

    # 草图55 → 切除-拉伸36 (cut)
    with BuildSketch(Plane(origin=(0, 0, -13.75), x_dir=(-1, 0, 0), z_dir=(0, 0, -1))):
        Polygon((-21.025993693, -5.964507533), (-15.525993693, -15.490786975), (-26.784323942, -21.990786975), (-32.284323942, -12.464507533), align=None)
    extrude(amount=-CUT_EXTRUDE_36_DEPTH, mode=Mode.SUBTRACT)

    # 草图57 → 切除-拉伸37 (cut)
    with BuildSketch(Plane.XY.offset(13.75)):
        with Locations((37.405158818, -22.012203869)):
            Circle(SKETCH_57_R)
        with Locations((32.735672764, -37.012203869)):
            Circle(SKETCH_57_R)
    extrude(amount=-CUT_EXTRUDE_37_DEPTH, mode=Mode.SUBTRACT)

    # 草图58 → 切除-拉伸38 (cut)
    with BuildSketch(Plane.XY.offset(13.75).offset(CUT_EXTRUDE_START)):
        Polygon((6.8140956, -18.485032606), (10.170964352, -9.065296294), (5.461096196, -7.386861918), (2.104227444, -16.80659823), (0.425793068, -21.516466385), (5.135661224, -23.194900761), align=None)
    extrude(amount=CUT_EXTRUDE_38_DEPTH, mode=Mode.SUBTRACT)

    # 草图59 → 凸台-拉伸16 (add)
    with BuildSketch(Plane.XY.offset(13.75)):
        Polygon((5.190496315, -5.16722778), (11.784311734, -7.517035907), (12.455685484, -5.633088644), (5.861870066, -3.283280518), align=None)
    extrude_16 = extrude(amount=EXTRUDE_16_DEPTH)

    # 草图61 → 切除-拉伸39 (cut)
    with BuildSketch(Plane(origin=(-0.377651369, -1.059730533, 0), x_dir=(0.9419736311729069, -0.3356868751901519, 0), z_dir=(0.3356868751901519, 0.9419736311729069, 0))):
        with Locations(Location((10.123881209, -16.75, 0), (0, 0, 180))):
            Circle(SKETCH_61_R)
    cut_extrude_39 = extrude(amount=-CUT_EXTRUDE_39_DEPTH, mode=Mode.SUBTRACT)

    # 草图62 → 切除-拉伸40 (cut)
    with BuildSketch(Plane(origin=(0, 0, -13.75), x_dir=(-1, 0, 0), z_dir=(0, 0, -1))):
        with Locations((-37.405158818, -22.012203869)):
            Circle(SKETCH_62_R)
        with Locations((-32.735672764, -37.012203869)):
            Circle(SKETCH_62_R)
    extrude(amount=-CUT_EXTRUDE_40_DEPTH, mode=Mode.SUBTRACT)

    # 镜向2: 凸台-拉伸16, 切除-拉伸39 across plane
    add(extrude_16.mirror(Plane.XY))
    add(cut_extrude_39.mirror(Plane.XY), mode=Mode.SUBTRACT)


solid = part.part
